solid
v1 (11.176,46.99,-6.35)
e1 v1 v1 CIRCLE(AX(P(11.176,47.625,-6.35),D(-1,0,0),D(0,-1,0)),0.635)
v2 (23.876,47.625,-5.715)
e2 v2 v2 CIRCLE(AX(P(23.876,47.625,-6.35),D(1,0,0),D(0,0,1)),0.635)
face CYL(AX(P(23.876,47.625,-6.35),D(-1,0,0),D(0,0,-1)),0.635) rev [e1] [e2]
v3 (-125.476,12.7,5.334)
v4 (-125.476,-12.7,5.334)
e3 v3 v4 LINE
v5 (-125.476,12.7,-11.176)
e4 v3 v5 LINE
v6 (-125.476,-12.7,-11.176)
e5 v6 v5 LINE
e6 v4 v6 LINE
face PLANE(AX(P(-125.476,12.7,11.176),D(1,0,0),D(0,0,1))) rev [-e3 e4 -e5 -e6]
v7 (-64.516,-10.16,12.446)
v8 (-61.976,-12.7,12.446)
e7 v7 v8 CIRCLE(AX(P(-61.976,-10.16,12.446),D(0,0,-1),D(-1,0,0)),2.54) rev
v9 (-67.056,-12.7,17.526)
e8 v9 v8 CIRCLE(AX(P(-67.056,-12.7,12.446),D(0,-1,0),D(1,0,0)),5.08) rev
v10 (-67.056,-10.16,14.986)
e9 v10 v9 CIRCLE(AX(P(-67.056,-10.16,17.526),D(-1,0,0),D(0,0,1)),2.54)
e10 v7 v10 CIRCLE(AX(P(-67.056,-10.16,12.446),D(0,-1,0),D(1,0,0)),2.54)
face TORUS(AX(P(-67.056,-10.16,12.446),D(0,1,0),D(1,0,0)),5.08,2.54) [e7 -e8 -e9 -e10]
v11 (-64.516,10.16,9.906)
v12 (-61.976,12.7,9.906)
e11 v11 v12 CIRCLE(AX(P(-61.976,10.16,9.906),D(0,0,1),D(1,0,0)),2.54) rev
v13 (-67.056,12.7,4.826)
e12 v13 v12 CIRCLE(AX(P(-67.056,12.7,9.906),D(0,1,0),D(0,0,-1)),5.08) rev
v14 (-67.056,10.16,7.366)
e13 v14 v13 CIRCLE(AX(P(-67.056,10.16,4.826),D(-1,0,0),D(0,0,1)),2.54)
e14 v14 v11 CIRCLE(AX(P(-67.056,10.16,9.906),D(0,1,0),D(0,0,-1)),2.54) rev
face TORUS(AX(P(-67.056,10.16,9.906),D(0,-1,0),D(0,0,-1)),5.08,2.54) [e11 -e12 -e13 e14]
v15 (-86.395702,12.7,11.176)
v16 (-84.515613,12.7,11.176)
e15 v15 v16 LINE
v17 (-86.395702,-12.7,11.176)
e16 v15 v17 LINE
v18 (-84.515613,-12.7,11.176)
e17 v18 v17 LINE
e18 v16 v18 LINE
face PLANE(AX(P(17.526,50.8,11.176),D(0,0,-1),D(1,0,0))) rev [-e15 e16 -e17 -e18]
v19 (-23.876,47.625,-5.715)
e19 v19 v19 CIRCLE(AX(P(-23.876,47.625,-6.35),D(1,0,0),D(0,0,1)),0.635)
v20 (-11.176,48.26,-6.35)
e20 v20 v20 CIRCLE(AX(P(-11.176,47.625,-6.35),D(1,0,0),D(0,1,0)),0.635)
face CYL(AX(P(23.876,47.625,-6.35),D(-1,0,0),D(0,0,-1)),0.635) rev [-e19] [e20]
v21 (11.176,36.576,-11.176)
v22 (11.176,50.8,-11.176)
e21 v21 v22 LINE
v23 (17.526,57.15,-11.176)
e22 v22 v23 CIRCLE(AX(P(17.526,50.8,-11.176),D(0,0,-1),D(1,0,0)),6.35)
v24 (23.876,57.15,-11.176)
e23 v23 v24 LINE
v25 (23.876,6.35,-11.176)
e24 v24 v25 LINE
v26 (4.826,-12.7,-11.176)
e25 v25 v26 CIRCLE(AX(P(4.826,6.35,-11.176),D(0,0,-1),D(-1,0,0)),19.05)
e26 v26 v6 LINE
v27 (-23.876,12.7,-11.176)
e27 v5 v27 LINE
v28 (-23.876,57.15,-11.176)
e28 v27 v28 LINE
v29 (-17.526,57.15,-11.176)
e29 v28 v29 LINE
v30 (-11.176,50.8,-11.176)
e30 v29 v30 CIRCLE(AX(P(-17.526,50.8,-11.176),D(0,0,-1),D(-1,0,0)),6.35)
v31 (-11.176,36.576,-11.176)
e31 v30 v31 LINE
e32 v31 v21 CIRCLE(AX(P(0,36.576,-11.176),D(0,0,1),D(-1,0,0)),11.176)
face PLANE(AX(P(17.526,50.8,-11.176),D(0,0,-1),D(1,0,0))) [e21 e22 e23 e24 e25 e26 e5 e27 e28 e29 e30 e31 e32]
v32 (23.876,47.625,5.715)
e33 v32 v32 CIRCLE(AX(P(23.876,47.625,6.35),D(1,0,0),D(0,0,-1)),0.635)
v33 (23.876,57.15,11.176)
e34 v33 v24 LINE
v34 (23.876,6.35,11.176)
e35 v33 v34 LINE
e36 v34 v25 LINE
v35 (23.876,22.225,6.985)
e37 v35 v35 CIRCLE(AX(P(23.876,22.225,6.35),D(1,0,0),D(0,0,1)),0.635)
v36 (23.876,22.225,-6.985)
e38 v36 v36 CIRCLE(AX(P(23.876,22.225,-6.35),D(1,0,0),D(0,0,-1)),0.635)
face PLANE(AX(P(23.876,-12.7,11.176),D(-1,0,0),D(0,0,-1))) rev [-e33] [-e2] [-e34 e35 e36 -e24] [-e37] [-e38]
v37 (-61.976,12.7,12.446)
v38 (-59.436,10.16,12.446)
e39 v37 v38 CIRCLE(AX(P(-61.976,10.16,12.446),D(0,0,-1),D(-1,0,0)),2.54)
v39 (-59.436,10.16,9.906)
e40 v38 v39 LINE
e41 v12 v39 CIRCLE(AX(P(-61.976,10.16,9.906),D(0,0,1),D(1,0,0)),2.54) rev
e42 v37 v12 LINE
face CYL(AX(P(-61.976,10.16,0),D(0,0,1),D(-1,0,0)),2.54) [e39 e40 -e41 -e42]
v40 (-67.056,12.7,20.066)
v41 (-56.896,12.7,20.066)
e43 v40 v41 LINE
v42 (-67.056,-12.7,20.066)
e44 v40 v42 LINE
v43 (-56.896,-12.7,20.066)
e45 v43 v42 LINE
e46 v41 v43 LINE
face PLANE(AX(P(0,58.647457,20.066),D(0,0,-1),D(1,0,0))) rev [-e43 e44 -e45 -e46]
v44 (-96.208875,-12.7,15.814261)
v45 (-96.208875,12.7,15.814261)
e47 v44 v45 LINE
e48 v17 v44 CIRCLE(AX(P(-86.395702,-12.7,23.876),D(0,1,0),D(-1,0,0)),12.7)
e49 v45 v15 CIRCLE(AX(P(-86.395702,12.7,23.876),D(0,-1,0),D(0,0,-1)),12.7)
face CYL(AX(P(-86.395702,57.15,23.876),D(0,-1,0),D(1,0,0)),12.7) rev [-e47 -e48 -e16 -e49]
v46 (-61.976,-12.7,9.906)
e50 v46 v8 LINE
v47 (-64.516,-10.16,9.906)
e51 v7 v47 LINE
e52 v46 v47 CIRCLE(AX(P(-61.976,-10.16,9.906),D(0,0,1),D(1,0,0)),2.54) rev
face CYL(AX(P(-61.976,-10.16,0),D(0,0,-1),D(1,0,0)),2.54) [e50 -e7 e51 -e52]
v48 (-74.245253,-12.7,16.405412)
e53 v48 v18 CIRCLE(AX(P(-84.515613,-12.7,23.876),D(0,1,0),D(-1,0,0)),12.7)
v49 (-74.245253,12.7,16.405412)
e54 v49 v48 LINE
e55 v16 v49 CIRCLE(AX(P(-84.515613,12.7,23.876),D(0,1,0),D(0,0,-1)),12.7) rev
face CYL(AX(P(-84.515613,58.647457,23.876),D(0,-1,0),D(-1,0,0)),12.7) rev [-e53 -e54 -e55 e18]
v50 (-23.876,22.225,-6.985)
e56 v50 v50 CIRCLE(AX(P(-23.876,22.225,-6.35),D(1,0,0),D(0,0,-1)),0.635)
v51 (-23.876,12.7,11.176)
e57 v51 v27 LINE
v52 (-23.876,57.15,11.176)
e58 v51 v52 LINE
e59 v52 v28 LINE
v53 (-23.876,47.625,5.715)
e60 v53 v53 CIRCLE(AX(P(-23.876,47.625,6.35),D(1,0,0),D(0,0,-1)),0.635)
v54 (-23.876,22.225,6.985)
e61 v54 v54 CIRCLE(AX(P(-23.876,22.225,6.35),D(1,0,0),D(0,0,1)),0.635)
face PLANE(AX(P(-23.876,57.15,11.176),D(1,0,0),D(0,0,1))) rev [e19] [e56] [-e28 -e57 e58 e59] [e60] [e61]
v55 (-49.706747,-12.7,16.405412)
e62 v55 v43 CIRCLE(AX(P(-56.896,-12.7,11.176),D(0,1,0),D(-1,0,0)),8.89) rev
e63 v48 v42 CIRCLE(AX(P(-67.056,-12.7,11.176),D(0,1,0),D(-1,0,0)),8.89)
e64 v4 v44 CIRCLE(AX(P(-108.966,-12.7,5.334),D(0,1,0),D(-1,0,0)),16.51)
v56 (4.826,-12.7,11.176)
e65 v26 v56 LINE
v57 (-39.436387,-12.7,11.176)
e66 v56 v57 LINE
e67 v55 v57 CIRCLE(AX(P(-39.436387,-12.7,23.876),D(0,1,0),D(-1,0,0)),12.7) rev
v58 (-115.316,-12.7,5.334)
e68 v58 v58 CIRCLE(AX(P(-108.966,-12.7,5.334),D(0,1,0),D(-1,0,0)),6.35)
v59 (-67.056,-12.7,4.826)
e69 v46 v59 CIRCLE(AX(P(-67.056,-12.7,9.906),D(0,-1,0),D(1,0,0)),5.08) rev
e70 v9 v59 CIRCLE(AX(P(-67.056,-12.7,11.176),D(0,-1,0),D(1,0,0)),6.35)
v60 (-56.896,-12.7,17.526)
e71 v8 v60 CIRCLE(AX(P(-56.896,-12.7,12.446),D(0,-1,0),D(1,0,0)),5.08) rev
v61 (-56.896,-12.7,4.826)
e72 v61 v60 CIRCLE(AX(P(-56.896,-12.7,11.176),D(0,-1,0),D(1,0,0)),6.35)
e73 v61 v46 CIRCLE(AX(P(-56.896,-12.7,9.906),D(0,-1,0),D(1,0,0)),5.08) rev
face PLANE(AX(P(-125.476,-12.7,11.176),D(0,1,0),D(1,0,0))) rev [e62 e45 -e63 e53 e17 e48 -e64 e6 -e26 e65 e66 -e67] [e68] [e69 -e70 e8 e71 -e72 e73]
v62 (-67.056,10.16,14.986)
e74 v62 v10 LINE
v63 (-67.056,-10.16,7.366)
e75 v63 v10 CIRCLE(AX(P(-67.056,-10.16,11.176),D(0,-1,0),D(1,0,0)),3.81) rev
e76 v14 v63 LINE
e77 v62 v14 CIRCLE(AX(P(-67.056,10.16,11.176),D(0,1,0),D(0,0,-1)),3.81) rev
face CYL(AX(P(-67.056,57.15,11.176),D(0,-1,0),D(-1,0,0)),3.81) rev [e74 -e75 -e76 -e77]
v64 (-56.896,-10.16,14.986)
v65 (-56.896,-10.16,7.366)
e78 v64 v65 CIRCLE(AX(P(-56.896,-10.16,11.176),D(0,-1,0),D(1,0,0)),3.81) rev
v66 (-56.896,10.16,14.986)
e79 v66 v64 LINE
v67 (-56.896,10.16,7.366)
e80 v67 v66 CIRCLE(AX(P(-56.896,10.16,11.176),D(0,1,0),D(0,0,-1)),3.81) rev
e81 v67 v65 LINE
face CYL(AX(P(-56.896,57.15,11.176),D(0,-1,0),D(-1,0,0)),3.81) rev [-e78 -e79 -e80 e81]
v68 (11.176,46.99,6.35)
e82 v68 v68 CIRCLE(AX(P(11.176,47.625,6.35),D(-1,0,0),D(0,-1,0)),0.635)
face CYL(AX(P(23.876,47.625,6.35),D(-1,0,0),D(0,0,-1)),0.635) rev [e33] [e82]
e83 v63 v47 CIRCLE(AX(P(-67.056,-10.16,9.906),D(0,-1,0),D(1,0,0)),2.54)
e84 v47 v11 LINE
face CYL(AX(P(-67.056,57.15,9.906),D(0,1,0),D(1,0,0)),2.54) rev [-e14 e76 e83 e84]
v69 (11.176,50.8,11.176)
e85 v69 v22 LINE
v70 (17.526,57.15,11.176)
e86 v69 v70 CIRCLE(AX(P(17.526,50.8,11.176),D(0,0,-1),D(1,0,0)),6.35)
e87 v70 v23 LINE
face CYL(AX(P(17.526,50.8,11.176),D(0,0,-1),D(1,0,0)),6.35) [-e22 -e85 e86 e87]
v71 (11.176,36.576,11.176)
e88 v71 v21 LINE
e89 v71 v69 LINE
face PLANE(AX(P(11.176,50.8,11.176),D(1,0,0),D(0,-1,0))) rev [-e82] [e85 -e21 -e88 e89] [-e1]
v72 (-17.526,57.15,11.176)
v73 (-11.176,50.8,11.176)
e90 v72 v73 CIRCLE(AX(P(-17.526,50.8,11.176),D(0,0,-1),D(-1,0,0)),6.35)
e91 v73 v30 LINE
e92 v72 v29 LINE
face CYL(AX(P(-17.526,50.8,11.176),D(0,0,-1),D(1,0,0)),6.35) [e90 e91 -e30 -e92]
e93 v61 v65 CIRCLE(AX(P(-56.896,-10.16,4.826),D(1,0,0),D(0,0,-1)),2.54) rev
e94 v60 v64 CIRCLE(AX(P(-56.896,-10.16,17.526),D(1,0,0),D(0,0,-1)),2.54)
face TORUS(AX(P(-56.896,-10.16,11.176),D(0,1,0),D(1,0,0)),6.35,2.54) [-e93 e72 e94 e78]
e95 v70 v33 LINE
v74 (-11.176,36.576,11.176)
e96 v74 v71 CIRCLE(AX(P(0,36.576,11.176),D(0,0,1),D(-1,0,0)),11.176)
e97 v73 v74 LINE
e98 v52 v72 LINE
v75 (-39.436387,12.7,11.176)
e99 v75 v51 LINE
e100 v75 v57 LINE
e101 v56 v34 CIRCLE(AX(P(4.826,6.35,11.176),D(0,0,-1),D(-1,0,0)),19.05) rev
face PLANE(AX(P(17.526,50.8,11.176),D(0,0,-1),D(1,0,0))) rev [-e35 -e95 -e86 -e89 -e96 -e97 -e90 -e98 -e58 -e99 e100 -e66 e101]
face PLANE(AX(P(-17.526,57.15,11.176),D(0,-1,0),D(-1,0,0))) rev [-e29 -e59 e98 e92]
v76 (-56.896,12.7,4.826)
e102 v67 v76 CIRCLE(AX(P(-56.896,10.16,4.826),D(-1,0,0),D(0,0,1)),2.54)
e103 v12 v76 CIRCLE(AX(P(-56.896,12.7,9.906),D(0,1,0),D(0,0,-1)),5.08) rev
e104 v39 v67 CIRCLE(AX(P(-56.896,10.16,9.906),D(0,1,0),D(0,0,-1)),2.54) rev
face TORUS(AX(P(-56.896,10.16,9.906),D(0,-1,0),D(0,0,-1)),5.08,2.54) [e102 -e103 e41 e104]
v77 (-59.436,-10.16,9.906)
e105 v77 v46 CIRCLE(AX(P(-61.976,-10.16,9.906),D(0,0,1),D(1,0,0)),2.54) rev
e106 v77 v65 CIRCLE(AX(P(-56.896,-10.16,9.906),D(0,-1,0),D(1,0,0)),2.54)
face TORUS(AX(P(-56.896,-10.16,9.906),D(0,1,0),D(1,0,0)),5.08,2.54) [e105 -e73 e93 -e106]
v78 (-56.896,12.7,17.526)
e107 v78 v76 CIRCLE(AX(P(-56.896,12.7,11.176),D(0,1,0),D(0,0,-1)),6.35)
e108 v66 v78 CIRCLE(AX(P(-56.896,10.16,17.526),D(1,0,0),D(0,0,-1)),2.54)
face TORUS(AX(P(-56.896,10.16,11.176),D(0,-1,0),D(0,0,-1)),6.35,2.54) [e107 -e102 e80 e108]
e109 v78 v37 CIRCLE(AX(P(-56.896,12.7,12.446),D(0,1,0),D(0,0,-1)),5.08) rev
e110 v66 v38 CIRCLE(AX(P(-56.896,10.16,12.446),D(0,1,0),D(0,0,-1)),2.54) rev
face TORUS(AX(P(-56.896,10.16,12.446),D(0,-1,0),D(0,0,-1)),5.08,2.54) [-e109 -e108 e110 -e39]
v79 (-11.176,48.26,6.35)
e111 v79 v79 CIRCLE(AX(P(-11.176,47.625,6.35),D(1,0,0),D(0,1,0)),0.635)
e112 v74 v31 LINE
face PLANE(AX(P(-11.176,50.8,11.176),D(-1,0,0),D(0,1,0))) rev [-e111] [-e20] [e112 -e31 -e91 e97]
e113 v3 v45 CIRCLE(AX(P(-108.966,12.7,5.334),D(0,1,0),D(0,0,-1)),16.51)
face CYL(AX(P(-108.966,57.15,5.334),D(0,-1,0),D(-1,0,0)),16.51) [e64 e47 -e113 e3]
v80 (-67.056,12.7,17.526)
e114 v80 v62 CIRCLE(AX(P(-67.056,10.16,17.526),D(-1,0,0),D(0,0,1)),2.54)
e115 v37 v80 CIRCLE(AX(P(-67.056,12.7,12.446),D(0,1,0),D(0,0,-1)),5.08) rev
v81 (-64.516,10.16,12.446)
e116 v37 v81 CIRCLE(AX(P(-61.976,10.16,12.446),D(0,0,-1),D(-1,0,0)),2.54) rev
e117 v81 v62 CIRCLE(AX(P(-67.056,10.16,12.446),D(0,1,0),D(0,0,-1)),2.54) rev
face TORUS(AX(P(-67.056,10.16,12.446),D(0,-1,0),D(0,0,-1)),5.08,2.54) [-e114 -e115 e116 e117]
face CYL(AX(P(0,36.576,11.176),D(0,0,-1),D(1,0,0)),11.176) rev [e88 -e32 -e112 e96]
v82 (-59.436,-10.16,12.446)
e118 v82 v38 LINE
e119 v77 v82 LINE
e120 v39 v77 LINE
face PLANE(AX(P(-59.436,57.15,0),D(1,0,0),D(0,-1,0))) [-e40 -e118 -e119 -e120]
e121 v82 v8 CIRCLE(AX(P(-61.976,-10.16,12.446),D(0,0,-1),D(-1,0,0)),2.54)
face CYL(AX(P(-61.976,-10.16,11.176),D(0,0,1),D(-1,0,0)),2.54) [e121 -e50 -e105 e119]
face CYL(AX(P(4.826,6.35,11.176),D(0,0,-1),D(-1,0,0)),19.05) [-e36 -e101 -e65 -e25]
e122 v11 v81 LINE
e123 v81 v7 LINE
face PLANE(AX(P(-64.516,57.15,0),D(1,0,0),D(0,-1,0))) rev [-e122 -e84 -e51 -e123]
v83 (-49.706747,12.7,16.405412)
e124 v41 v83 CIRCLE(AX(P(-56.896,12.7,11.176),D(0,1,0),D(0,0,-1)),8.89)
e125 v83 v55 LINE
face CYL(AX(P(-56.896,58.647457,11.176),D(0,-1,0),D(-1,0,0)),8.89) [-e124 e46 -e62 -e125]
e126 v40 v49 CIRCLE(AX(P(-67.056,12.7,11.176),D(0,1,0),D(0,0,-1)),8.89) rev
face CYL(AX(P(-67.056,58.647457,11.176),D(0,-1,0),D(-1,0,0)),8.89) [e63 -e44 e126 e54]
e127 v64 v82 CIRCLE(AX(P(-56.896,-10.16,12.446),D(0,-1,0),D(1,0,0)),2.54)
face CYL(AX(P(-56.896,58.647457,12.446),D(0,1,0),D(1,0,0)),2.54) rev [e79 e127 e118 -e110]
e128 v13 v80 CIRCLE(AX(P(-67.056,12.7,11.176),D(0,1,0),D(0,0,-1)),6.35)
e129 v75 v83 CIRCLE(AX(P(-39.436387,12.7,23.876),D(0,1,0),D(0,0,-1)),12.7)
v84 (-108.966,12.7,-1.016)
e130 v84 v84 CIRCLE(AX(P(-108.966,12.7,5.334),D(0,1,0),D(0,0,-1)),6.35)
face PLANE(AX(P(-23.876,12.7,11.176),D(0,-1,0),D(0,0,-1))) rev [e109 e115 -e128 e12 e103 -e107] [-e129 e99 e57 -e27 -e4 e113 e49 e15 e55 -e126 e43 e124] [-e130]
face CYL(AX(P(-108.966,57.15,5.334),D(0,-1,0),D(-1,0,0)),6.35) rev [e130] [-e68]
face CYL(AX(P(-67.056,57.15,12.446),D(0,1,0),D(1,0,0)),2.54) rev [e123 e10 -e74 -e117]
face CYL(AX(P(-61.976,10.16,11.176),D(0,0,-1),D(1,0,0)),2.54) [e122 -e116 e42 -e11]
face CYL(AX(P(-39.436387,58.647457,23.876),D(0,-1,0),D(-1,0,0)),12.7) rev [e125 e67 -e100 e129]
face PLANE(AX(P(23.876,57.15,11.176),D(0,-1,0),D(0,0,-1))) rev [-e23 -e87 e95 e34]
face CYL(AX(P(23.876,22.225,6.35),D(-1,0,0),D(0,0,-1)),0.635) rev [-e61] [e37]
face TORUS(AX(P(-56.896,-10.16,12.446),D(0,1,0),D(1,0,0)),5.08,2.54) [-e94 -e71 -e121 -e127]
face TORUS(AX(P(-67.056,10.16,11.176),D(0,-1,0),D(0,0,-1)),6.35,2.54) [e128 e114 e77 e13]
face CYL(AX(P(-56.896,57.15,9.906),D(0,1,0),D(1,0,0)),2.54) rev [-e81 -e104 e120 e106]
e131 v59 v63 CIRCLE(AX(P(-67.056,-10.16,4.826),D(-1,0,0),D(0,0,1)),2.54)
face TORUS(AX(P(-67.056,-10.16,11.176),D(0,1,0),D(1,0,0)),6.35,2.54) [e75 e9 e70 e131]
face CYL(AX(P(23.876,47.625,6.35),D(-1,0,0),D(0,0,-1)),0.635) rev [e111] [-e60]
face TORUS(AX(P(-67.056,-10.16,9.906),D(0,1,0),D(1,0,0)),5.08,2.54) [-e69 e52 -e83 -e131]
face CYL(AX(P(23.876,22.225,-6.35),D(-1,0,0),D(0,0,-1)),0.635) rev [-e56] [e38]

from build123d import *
from build123d.topology import SkipClean

# Parameters (mm, degrees)
BOSS_EXTRUDE1_DEPTH = 11.176
CUT_EXTRUDE3_DEPTH  = 145.042188445
SKETCH2_4_R         = 16.51
SKETCH2_4_R_2       = 6.35
BOSS_EXTRUDE2_DEPTH = 25.4
SKETCH3_R           = 0.635
CUT_EXTRUDE4_DEPTH  = 119.599506053
CUT_EXTRUDE5_DEPTH  = 146.259799711
BOSS_EXTRUDE3_DEPTH = 25.4
FILLET5_R           = 2.54
FILLET6_R           = 19.05
FILLET9_R           = 12.7


with BuildPart() as part:
    # Sketch1 → Boss-Extrude1 (new, symmetric)
    with BuildSketch(Plane.XY):
        with BuildLine():
            Line((-23.876, -12.7), (-23.876, 57.15))
            Line((-23.876, 57.15), (-17.526, 57.15))
            ThreePointArc((-17.526, 57.15), (-13.035871939, 55.290128061), (-11.176, 50.8))
            Line((-11.176, 50.8), (-11.176, 36.576))
            ThreePointArc((-11.176, 36.576), (0, 25.4), (11.176, 36.576))
            Line((11.176, 36.576), (11.176, 50.8))
            ThreePointArc((11.176, 50.8), (13.035871939, 55.290128061), (17.526, 57.15))
            Line((17.526, 57.15), (23.876, 57.15))
            Line((23.876, 57.15), (23.876, 12.7))
            Line((23.876, 12.7), (125.476, 12.7))
            Line((125.476, 12.7), (125.476, -12.7))
            Line((125.476, -12.7), (-23.876, -12.7))
        make_face()
    extrude(amount=BOSS_EXTRUDE1_DEPTH, both=True)

    # Sketch2 → Cut-Extrude3 (cut, through all)
    with BuildSketch(Plane(origin=(0, -12.7, 0), x_dir=(-1, 0, 0), z_dir=(0, -1, 0))):
        with BuildLine():
            ThreePointArc((-124.4078631, -11.176), (-125.206770606, -8.303422521), (-125.476, -5.334))
            Line((-125.476, -5.334), (-125.476, -11.176))
            Line((-125.476, -11.176), (-124.4078631, -11.176))
        make_face()
        with BuildLine():
            ThreePointArc((-106.477318421, -11.176), (-108.966, 1.016), (-111.454681579, -11.176))
            Line((-111.454681579, -11.176), (-106.477318421, -11.176))
        make_face()
    extrude(amount=-CUT_EXTRUDE3_DEPTH, mode=Mode.SUBTRACT)

    # Sketch2<4> → Boss-Extrude2 (add)
    with SkipClean():  # the faces are left unmerged after this step: merging them gives an invalid solid
        with BuildSketch(Plane(origin=(0, -12.7, 0), x_dir=(-1, 0, 0), z_dir=(0, -1, 0))):
            with Locations((-108.966, -5.334)):
                Circle(SKETCH2_4_R)
            with Locations(Location((-108.966, -5.334, 0), (0, 0, 180))):
                Circle(SKETCH2_4_R_2, mode=Mode.SUBTRACT)
        extrude(amount=-BOSS_EXTRUDE2_DEPTH)

    # Sketch3 → Cut-Extrude4 (cut, through all)
    with SkipClean():  # the faces are left unmerged after this step: merging them gives an invalid solid
        with BuildSketch(Plane(origin=(23.876, 0, 0), x_dir=(0, 0, -1), z_dir=(1, 0, 0))):
            with Locations((6.35, 22.225)):
                Circle(SKETCH3_R)
            with Locations(Location((-6.35, 22.225, 0), (0, 0, 180))):
                Circle(SKETCH3_R)
            with Locations(Location((6.35, 47.625, 0), (0, 0, 270))):
                Circle(SKETCH3_R)
            with Locations((-6.35, 47.625)):
                Circle(SKETCH3_R)
        extrude(amount=-CUT_EXTRUDE4_DEPTH, mode=Mode.SUBTRACT)

    # Sketch4 → Cut-Extrude5 (cut, through all)
    with SkipClean():  # the faces are left unmerged after this step: merging them gives an invalid solid
        with BuildSketch(Plane(origin=(0, -12.7, 0), x_dir=(-1, 0, 0), z_dir=(0, -1, 0))):
            with BuildLine():
                Line((-59.436, -7.366), (-59.436, -11.176))
                Line((-59.436, -11.176), (-53.086, -11.176))
                ThreePointArc((-53.086, -11.176), (-54.201923164, -8.481923164), (-56.896, -7.366))
                Line((-56.896, -7.366), (-59.436, -7.366))
            make_face()
            with BuildLine():
                Line((-70.866, -11.176), (-64.516, -11.176))
                Line((-64.516, -11.176), (-64.516, -7.366))
                Line((-64.516, -7.366), (-67.056, -7.366))
                ThreePointArc((-67.056, -7.366), (-69.750076836, -8.481923164), (-70.866, -11.176))
            make_face()
            with BuildLine():
                Line((-59.436, -11.176), (-59.436, -14.986))
                Line((-59.436, -14.986), (-56.896, -14.986))
                ThreePointArc((-56.896, -14.986), (-54.201923164, -13.870076836), (-53.086, -11.176))
                Line((-53.086, -11.176), (-59.436, -11.176))
            make_face()
            with BuildLine():
                Line((-64.516, -14.986), (-64.516, -11.176))
                Line((-64.516, -11.176), (-70.866, -11.176))
                ThreePointArc((-70.866, -11.176), (-69.750076836, -13.870076836), (-67.056, -14.986))
                Line((-67.056, -14.986), (-64.516, -14.986))
            make_face()
        extrude(amount=-CUT_EXTRUDE5_DEPTH, mode=Mode.SUBTRACT)

    # Sketch4<3> → Boss-Extrude3 (add)
    with SkipClean():  # the faces are left unmerged after this step: merging them gives an invalid solid
        with BuildSketch(Plane(origin=(0, -12.7, 0), x_dir=(-1, 0, 0), z_dir=(0, -1, 0))):
            with BuildLine():
                Line((-56.896, -14.986), (-59.436, -14.986))
                Line((-59.436, -14.986), (-59.436, -11.176))
                Line((-59.436, -11.176), (-64.516, -11.176))
                Line((-64.516, -11.176), (-64.516, -14.986))
                Line((-64.516, -14.986), (-67.056, -14.986))
                ThreePointArc((-67.056, -14.986), (-69.750076836, -13.870076836), (-70.866, -11.176))
                Line((-70.866, -11.176), (-84.515613398, -11.176))
                ThreePointArc((-84.515613398, -11.176), (-78.753082295, -12.558613584), (-74.245252576, -16.405411765))
                ThreePointArc((-74.245252576, -16.405411765), (-71.089771772, -19.098170491), (-67.056, -20.066))
                Line((-67.056, -20.066), (-56.896, -20.066))
                ThreePointArc((-56.896, -20.066), (-52.862228228, -19.098170491), (-49.706747424, -16.405411765))
                ThreePointArc((-49.706747424, -16.405411765), (-45.198917705, -12.558613584), (-39.436386602, -11.176))
                Line((-39.436386602, -11.176), (-53.086, -11.176))
                ThreePointArc((-53.086, -11.176), (-54.201923164, -13.870076836), (-56.896, -14.986))
            make_face()
        extrude(amount=-BOSS_EXTRUDE3_DEPTH)

    # Fillet5
    fillet5_edges = [part.edges().sort_by_distance(p)[0] for p in [
        (54.201923164, -12.7, 13.870076836),
        (54.201923164, 12.7, 8.481923164),
        (69.750076836, -12.7, 8.481923164),
        (69.750076836, 12.7, 8.481923164),
        (59.436, 0, 14.986),
        (59.436, -12.7, 13.081),
        (59.436, 12.7, 9.271),
        (64.516, 0, 14.986),
        (64.516, 12.7, 13.081),
        (64.516, -12.7, 13.081),
        (59.436, 0, 7.366),
        (64.516, 0, 7.366),
    ]]
    fillet(fillet5_edges, radius=FILLET5_R - 0.0001)  # a hair under: the kernel refuses the full size


with BuildPart() as body_2:
    # Mirror1: mirrored copy
    add(part.part.mirror(Plane(origin=(0, 0, 0), x_dir=(0, 0, 1), z_dir=(1, 0, 0))))

    # Fillet6
    fillet6_edges = [body_2.edges().sort_by_distance(p)[0] for p in [
        (23.876, -12.7, 0),
    ]]
    fillet(fillet6_edges, radius=FILLET6_R)

    # Fillet9
    fillet9_edges = [body_2.edges().sort_by_distance(p)[0] for p in [
        (-93.5241369, 0, 11.176),
    ]]
    fillet(fillet9_edges, radius=FILLET9_R)


solid = body_2.part
